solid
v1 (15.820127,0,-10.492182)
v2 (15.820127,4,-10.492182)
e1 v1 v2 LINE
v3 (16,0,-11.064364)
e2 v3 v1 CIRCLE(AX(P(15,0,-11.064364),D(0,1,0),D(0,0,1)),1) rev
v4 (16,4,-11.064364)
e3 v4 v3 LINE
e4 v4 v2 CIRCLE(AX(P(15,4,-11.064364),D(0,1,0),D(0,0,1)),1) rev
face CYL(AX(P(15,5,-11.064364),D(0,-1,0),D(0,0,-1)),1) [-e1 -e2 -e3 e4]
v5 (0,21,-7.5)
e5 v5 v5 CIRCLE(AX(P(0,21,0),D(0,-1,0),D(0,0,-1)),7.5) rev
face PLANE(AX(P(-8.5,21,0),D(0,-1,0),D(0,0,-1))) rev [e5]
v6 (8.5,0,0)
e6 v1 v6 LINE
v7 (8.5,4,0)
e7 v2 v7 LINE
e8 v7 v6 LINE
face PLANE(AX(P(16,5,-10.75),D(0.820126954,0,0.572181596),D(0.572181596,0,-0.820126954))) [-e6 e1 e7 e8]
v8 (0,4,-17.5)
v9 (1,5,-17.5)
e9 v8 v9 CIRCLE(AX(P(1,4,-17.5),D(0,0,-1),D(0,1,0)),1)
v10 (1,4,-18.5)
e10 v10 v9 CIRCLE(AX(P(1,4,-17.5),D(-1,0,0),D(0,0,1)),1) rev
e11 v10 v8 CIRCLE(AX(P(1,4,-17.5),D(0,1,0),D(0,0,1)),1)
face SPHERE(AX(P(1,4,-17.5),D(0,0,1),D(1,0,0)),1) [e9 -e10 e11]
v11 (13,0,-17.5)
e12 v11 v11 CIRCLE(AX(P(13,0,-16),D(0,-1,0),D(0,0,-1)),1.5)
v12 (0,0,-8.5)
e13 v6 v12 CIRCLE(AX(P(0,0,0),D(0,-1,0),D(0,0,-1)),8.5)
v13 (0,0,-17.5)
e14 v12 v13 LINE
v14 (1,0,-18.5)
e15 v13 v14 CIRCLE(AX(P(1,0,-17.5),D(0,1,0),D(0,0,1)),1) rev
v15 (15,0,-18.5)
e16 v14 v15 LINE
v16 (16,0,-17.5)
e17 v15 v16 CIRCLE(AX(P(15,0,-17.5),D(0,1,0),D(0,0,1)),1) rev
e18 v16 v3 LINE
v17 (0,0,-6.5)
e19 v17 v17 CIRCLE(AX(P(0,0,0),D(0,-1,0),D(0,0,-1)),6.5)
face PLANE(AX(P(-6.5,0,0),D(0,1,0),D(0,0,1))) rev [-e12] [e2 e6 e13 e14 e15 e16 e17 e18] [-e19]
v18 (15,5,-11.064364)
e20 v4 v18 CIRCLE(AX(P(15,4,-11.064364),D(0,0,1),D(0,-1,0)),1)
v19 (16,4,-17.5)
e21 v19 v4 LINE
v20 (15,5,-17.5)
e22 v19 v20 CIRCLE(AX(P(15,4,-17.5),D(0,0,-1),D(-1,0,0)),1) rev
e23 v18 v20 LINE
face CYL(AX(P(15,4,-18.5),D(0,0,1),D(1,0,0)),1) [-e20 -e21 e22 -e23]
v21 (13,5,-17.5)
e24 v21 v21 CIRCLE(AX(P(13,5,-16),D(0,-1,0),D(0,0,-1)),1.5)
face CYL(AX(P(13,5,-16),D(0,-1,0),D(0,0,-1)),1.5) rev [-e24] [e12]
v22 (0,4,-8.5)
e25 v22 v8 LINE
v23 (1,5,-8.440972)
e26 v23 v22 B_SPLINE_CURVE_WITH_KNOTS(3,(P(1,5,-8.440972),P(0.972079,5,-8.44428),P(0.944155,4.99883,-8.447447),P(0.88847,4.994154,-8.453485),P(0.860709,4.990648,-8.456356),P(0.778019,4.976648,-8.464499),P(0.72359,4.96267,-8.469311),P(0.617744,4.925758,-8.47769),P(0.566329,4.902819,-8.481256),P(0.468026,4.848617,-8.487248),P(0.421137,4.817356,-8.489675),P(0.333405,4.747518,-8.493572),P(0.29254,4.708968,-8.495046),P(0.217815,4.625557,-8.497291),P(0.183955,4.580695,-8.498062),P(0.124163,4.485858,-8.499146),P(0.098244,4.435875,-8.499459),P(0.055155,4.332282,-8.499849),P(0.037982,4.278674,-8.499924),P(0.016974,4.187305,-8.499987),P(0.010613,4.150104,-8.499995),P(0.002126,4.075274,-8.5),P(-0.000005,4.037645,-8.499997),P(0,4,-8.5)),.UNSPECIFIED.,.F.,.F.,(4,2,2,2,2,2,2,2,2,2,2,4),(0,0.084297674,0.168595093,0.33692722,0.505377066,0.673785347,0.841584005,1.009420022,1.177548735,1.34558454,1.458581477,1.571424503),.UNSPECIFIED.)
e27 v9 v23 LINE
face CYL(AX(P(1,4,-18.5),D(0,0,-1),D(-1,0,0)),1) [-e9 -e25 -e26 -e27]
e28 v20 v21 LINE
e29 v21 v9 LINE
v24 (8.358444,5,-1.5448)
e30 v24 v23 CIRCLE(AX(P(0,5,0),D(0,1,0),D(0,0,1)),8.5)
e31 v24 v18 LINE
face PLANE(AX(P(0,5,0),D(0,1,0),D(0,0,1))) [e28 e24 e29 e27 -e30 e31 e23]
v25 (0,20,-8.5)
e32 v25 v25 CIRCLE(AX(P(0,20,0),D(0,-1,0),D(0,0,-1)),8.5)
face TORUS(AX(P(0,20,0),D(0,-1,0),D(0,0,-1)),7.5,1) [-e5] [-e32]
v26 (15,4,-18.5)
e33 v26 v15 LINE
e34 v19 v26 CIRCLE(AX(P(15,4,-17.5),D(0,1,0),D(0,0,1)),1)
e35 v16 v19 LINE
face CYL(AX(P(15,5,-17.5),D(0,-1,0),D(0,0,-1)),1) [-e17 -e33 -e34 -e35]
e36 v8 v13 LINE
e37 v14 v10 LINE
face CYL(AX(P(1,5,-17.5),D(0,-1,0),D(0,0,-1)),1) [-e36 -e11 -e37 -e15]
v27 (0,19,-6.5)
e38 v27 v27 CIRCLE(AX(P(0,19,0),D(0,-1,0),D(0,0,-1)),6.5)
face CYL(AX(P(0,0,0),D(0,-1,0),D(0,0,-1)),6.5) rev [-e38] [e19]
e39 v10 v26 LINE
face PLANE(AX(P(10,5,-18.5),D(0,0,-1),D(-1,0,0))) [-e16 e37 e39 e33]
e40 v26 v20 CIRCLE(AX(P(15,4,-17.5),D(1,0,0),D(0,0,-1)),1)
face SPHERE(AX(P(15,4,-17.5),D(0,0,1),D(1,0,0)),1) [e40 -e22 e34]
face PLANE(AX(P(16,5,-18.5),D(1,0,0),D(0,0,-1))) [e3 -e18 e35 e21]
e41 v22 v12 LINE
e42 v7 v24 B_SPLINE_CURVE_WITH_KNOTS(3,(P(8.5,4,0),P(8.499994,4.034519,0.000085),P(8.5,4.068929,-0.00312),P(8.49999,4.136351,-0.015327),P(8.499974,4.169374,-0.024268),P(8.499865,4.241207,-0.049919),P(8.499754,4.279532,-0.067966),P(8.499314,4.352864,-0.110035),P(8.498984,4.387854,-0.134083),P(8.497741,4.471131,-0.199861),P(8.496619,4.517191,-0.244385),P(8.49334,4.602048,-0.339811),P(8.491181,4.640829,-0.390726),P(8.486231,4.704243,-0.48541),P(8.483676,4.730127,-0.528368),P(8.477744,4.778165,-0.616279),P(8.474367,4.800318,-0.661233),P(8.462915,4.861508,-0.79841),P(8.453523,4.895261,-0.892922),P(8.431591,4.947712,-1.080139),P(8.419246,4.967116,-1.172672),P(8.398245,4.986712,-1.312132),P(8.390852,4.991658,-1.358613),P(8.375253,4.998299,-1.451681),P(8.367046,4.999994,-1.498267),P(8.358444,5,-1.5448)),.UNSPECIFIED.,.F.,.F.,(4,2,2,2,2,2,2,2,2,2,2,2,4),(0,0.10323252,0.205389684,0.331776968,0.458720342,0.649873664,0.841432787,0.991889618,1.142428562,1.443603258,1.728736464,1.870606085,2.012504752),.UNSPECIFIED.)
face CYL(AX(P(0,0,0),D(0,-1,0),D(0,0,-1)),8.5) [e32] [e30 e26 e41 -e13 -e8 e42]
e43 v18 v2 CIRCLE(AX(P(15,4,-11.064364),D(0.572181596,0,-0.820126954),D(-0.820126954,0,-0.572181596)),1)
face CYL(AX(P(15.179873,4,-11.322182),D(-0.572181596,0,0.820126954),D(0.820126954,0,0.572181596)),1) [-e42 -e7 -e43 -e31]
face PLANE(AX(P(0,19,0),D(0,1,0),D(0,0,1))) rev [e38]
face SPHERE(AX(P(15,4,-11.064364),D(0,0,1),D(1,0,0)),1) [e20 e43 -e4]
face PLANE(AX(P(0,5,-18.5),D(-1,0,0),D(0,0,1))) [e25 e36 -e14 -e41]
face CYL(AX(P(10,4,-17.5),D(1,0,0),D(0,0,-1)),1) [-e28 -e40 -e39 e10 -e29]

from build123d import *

# Parameters (mm, degrees)
SALIENTE_EXTRUIR1_START = -5
CROQUIS2_R              = 1.5
SALIENTE_EXTRUIR1_DEPTH = 5
REDONDEO1_R             = 1


with BuildPart() as part:
    # Croquis1 → Revolución1 (revolve)
    with BuildSketch(Plane.XY, mode=Mode.PRIVATE) as revoluci_n1_sk:
        Polygon((0, 19), (-6.5, 19), (-6.5, 0), (-8.5, 0), (-8.5, 21), (0, 21), align=None)
    revolve(revoluci_n1_sk.sketch.rotate(Axis((0, 0, 0), (0, 1, 0)), 270), axis=Axis((0, 0, 0), (0, 1, 0)))

    # Croquis2 → Saliente-Extruir1 (add)
    with BuildSketch(Plane.XZ.offset(SALIENTE_EXTRUIR1_START)):
        with BuildLine():
            Line((10, -18.5), (16, -18.5))
            Line((16, -18.5), (16, -10.75))
            Line((16, -10.75), (8.5, 0))
            ThreePointArc((8.5, 0), (6.01040764, -6.01040764), (0, -8.5))
            Line((0, -8.5), (0, -18.5))
            Line((0, -18.5), (10, -18.5))
        make_face()
        with Locations(Location((13, -16, 0), (0, 0, 270))):
            Circle(CROQUIS2_R, mode=Mode.SUBTRACT)
    extrude(amount=SALIENTE_EXTRUIR1_DEPTH)

    # Redondeo1
    # the kernel refuses this fillet: 1 mm, written as the material it takes off along each edge
    with BuildSketch(Plane(origin=(15, 4, -11.064363564), x_dir=(0.8201269543011832, 0, 0.5721815960240815), z_dir=(0, 1, 0))) as redondeo1_piece_1_section:
        Polygon((0, 0), (REDONDEO1_R, 0), (REDONDEO1_R, REDONDEO1_R * 0.314363563856), (REDONDEO1_R * 0.820126954301, REDONDEO1_R * 0.572181596024), align=None)
    redondeo1_piece_1 = extrude(amount=REDONDEO1_R, mode=Mode.PRIVATE)
    redondeo1_piece_1 = redondeo1_piece_1 - Plane(origin=(15, 4, -11.064363564), x_dir=(-0.9539724719039809, 0, -0.29989418608804086), z_dir=(0, 1, 0)) * Sphere(REDONDEO1_R, mode=Mode.PRIVATE)
    add(redondeo1_piece_1, mode=Mode.SUBTRACT)
    with BuildSketch(Plane(origin=(15, 4, -17.5), x_dir=(1, 0, 0), z_dir=(0, 0, -1))) as redondeo1_piece_2_section:
        Polygon((0, 0), (REDONDEO1_R, 0), (REDONDEO1_R, -REDONDEO1_R), (0, -REDONDEO1_R), align=None)
    redondeo1_piece_2 = extrude(amount=REDONDEO1_R, mode=Mode.PRIVATE)
    redondeo1_piece_2 = redondeo1_piece_2 - Plane(origin=(15, 4, -17.5), x_dir=(-0.7071067811865475, -0.7071067811865475, 0), z_dir=(0, 0, -1)) * Sphere(REDONDEO1_R, mode=Mode.PRIVATE)
    add(redondeo1_piece_2, mode=Mode.SUBTRACT)
    with BuildSketch(Plane(origin=(1, 4, -17.5), x_dir=(-1, 0, 0), z_dir=(0, 0, -1))) as redondeo1_piece_3_section:
        Polygon((0, 0), (REDONDEO1_R, 0), (REDONDEO1_R, REDONDEO1_R), (0, REDONDEO1_R), align=None)
    redondeo1_piece_3 = extrude(amount=REDONDEO1_R, mode=Mode.PRIVATE)
    redondeo1_piece_3 = redondeo1_piece_3 - Plane(origin=(1, 4, -17.5), x_dir=(0.7071067811865475, -0.7071067811865475, 0), z_dir=(0, 0, -1)) * Sphere(REDONDEO1_R, mode=Mode.PRIVATE)
    add(redondeo1_piece_3, mode=Mode.SUBTRACT)
    with BuildSketch(Plane(origin=(15.820126954, 5, -10.492181968), x_dir=(-0.8201269543011831, 0, -0.5721815960240815), z_dir=(-0.5721815960240815, 0, 0.8201269543011832))) as redondeo1_piece_4_section:
        with BuildLine():
            CenterArc((REDONDEO1_R, REDONDEO1_R), REDONDEO1_R, 180, 90)
            Line((0, REDONDEO1_R), (0, 0))
            Line((0, 0), (REDONDEO1_R, 0))
        make_face()
    redondeo1_piece_4 = extrude(amount=15.293363165, mode=Mode.PRIVATE)
    redondeo1_piece_4 = redondeo1_piece_4 - Plane(origin=(0, 4.770801137, 0), x_dir=(0, 0, -1), z_dir=(0, 1, 0)) * Cylinder(8.5, 35, mode=Mode.PRIVATE)
    add(redondeo1_piece_4, mode=Mode.SUBTRACT)
    with BuildSketch(Plane(origin=(16, 5, -17.5), x_dir=(-1, 0, 0), z_dir=(0, 0, 1))) as redondeo1_piece_5:
        with BuildLine():
            CenterArc((REDONDEO1_R, REDONDEO1_R), REDONDEO1_R, 180, 90)
            Line((0, REDONDEO1_R), (0, 0))
            Line((0, 0), (REDONDEO1_R, 0))
        make_face()
    extrude(amount=6.435636436, mode=Mode.SUBTRACT)
    with BuildSketch(Plane(origin=(16, 4, -10.75), x_dir=(-0.5721815960240826, 0, 0.8201269543011824), z_dir=(0, -1, 0))) as redondeo1_piece_6:
        with BuildLine():
            CenterArc((REDONDEO1_R * 0.314363563856, REDONDEO1_R), REDONDEO1_R, 235.097504384, 34.902495616)
            Line((-REDONDEO1_R * 0.257818032168, REDONDEO1_R * 0.179873045699), (0, 0))
            Line((0, 0), (REDONDEO1_R * 0.314363563856, 0))
        make_face()
    extrude(amount=4.78590891, mode=Mode.SUBTRACT)
    with BuildSketch(Plane(origin=(1, 5, -18.5), x_dir=(0, 0, 1), z_dir=(1, 0, 0))) as redondeo1_piece_7:
        with BuildLine():
            CenterArc((REDONDEO1_R, REDONDEO1_R), REDONDEO1_R, 180, 90)
            Line((0, REDONDEO1_R), (0, 0))
            Line((0, 0), (REDONDEO1_R, 0))
        make_face()
    extrude(amount=14, mode=Mode.SUBTRACT)
    with BuildSketch(Plane(origin=(16, 4, -18.5), x_dir=(-1, 0, 0), z_dir=(0, -1, 0)), Plane(origin=(0, 4, -18.5), x_dir=(0, 0, 1), z_dir=(0, -1, 0))) as redondeo1_piece_8:
        with BuildLine():
            CenterArc((REDONDEO1_R, -REDONDEO1_R), REDONDEO1_R, 90, 90)
            Line((0, -REDONDEO1_R), (0, 0))
            Line((0, 0), (REDONDEO1_R, 0))
        make_face()
    extrude(amount=6.5, mode=Mode.SUBTRACT)
    with BuildSketch(Plane(origin=(0, 5, -6), x_dir=(0, -1, 0), z_dir=(0, 0, -1))) as redondeo1_piece_9_section:
        with BuildLine():
            CenterArc((REDONDEO1_R, -REDONDEO1_R), REDONDEO1_R, 90, 90)
            Line((0, -REDONDEO1_R), (0, 0))
            Line((0, 0), (REDONDEO1_R, 0))
        make_face()
    redondeo1_piece_9 = extrude(amount=11.5, mode=Mode.PRIVATE)
    redondeo1_piece_9 = redondeo1_piece_9 - Plane(origin=(0, 4.773710582, 0), x_dir=(0, 0, -1), z_dir=(0, 1, 0)) * Cylinder(8.5, 27, mode=Mode.PRIVATE)
    add(redondeo1_piece_9, mode=Mode.SUBTRACT)
    with BuildSketch(Plane(origin=(0, 21, 0), x_dir=(0, 0, -1), z_dir=(1, 0, 0))) as redondeo1_piece_10:
        with BuildLine():
            CenterArc((8.5 - REDONDEO1_R, -REDONDEO1_R), REDONDEO1_R, 0, 90)
            Line((8.5 - REDONDEO1_R, 0), (8.5, 0))
            Line((8.5, 0), (8.5, -REDONDEO1_R))
        make_face()
    revolve(axis=Axis((0, 21, 0), (0, 1, 0)), mode=Mode.SUBTRACT)


solid = part.part
